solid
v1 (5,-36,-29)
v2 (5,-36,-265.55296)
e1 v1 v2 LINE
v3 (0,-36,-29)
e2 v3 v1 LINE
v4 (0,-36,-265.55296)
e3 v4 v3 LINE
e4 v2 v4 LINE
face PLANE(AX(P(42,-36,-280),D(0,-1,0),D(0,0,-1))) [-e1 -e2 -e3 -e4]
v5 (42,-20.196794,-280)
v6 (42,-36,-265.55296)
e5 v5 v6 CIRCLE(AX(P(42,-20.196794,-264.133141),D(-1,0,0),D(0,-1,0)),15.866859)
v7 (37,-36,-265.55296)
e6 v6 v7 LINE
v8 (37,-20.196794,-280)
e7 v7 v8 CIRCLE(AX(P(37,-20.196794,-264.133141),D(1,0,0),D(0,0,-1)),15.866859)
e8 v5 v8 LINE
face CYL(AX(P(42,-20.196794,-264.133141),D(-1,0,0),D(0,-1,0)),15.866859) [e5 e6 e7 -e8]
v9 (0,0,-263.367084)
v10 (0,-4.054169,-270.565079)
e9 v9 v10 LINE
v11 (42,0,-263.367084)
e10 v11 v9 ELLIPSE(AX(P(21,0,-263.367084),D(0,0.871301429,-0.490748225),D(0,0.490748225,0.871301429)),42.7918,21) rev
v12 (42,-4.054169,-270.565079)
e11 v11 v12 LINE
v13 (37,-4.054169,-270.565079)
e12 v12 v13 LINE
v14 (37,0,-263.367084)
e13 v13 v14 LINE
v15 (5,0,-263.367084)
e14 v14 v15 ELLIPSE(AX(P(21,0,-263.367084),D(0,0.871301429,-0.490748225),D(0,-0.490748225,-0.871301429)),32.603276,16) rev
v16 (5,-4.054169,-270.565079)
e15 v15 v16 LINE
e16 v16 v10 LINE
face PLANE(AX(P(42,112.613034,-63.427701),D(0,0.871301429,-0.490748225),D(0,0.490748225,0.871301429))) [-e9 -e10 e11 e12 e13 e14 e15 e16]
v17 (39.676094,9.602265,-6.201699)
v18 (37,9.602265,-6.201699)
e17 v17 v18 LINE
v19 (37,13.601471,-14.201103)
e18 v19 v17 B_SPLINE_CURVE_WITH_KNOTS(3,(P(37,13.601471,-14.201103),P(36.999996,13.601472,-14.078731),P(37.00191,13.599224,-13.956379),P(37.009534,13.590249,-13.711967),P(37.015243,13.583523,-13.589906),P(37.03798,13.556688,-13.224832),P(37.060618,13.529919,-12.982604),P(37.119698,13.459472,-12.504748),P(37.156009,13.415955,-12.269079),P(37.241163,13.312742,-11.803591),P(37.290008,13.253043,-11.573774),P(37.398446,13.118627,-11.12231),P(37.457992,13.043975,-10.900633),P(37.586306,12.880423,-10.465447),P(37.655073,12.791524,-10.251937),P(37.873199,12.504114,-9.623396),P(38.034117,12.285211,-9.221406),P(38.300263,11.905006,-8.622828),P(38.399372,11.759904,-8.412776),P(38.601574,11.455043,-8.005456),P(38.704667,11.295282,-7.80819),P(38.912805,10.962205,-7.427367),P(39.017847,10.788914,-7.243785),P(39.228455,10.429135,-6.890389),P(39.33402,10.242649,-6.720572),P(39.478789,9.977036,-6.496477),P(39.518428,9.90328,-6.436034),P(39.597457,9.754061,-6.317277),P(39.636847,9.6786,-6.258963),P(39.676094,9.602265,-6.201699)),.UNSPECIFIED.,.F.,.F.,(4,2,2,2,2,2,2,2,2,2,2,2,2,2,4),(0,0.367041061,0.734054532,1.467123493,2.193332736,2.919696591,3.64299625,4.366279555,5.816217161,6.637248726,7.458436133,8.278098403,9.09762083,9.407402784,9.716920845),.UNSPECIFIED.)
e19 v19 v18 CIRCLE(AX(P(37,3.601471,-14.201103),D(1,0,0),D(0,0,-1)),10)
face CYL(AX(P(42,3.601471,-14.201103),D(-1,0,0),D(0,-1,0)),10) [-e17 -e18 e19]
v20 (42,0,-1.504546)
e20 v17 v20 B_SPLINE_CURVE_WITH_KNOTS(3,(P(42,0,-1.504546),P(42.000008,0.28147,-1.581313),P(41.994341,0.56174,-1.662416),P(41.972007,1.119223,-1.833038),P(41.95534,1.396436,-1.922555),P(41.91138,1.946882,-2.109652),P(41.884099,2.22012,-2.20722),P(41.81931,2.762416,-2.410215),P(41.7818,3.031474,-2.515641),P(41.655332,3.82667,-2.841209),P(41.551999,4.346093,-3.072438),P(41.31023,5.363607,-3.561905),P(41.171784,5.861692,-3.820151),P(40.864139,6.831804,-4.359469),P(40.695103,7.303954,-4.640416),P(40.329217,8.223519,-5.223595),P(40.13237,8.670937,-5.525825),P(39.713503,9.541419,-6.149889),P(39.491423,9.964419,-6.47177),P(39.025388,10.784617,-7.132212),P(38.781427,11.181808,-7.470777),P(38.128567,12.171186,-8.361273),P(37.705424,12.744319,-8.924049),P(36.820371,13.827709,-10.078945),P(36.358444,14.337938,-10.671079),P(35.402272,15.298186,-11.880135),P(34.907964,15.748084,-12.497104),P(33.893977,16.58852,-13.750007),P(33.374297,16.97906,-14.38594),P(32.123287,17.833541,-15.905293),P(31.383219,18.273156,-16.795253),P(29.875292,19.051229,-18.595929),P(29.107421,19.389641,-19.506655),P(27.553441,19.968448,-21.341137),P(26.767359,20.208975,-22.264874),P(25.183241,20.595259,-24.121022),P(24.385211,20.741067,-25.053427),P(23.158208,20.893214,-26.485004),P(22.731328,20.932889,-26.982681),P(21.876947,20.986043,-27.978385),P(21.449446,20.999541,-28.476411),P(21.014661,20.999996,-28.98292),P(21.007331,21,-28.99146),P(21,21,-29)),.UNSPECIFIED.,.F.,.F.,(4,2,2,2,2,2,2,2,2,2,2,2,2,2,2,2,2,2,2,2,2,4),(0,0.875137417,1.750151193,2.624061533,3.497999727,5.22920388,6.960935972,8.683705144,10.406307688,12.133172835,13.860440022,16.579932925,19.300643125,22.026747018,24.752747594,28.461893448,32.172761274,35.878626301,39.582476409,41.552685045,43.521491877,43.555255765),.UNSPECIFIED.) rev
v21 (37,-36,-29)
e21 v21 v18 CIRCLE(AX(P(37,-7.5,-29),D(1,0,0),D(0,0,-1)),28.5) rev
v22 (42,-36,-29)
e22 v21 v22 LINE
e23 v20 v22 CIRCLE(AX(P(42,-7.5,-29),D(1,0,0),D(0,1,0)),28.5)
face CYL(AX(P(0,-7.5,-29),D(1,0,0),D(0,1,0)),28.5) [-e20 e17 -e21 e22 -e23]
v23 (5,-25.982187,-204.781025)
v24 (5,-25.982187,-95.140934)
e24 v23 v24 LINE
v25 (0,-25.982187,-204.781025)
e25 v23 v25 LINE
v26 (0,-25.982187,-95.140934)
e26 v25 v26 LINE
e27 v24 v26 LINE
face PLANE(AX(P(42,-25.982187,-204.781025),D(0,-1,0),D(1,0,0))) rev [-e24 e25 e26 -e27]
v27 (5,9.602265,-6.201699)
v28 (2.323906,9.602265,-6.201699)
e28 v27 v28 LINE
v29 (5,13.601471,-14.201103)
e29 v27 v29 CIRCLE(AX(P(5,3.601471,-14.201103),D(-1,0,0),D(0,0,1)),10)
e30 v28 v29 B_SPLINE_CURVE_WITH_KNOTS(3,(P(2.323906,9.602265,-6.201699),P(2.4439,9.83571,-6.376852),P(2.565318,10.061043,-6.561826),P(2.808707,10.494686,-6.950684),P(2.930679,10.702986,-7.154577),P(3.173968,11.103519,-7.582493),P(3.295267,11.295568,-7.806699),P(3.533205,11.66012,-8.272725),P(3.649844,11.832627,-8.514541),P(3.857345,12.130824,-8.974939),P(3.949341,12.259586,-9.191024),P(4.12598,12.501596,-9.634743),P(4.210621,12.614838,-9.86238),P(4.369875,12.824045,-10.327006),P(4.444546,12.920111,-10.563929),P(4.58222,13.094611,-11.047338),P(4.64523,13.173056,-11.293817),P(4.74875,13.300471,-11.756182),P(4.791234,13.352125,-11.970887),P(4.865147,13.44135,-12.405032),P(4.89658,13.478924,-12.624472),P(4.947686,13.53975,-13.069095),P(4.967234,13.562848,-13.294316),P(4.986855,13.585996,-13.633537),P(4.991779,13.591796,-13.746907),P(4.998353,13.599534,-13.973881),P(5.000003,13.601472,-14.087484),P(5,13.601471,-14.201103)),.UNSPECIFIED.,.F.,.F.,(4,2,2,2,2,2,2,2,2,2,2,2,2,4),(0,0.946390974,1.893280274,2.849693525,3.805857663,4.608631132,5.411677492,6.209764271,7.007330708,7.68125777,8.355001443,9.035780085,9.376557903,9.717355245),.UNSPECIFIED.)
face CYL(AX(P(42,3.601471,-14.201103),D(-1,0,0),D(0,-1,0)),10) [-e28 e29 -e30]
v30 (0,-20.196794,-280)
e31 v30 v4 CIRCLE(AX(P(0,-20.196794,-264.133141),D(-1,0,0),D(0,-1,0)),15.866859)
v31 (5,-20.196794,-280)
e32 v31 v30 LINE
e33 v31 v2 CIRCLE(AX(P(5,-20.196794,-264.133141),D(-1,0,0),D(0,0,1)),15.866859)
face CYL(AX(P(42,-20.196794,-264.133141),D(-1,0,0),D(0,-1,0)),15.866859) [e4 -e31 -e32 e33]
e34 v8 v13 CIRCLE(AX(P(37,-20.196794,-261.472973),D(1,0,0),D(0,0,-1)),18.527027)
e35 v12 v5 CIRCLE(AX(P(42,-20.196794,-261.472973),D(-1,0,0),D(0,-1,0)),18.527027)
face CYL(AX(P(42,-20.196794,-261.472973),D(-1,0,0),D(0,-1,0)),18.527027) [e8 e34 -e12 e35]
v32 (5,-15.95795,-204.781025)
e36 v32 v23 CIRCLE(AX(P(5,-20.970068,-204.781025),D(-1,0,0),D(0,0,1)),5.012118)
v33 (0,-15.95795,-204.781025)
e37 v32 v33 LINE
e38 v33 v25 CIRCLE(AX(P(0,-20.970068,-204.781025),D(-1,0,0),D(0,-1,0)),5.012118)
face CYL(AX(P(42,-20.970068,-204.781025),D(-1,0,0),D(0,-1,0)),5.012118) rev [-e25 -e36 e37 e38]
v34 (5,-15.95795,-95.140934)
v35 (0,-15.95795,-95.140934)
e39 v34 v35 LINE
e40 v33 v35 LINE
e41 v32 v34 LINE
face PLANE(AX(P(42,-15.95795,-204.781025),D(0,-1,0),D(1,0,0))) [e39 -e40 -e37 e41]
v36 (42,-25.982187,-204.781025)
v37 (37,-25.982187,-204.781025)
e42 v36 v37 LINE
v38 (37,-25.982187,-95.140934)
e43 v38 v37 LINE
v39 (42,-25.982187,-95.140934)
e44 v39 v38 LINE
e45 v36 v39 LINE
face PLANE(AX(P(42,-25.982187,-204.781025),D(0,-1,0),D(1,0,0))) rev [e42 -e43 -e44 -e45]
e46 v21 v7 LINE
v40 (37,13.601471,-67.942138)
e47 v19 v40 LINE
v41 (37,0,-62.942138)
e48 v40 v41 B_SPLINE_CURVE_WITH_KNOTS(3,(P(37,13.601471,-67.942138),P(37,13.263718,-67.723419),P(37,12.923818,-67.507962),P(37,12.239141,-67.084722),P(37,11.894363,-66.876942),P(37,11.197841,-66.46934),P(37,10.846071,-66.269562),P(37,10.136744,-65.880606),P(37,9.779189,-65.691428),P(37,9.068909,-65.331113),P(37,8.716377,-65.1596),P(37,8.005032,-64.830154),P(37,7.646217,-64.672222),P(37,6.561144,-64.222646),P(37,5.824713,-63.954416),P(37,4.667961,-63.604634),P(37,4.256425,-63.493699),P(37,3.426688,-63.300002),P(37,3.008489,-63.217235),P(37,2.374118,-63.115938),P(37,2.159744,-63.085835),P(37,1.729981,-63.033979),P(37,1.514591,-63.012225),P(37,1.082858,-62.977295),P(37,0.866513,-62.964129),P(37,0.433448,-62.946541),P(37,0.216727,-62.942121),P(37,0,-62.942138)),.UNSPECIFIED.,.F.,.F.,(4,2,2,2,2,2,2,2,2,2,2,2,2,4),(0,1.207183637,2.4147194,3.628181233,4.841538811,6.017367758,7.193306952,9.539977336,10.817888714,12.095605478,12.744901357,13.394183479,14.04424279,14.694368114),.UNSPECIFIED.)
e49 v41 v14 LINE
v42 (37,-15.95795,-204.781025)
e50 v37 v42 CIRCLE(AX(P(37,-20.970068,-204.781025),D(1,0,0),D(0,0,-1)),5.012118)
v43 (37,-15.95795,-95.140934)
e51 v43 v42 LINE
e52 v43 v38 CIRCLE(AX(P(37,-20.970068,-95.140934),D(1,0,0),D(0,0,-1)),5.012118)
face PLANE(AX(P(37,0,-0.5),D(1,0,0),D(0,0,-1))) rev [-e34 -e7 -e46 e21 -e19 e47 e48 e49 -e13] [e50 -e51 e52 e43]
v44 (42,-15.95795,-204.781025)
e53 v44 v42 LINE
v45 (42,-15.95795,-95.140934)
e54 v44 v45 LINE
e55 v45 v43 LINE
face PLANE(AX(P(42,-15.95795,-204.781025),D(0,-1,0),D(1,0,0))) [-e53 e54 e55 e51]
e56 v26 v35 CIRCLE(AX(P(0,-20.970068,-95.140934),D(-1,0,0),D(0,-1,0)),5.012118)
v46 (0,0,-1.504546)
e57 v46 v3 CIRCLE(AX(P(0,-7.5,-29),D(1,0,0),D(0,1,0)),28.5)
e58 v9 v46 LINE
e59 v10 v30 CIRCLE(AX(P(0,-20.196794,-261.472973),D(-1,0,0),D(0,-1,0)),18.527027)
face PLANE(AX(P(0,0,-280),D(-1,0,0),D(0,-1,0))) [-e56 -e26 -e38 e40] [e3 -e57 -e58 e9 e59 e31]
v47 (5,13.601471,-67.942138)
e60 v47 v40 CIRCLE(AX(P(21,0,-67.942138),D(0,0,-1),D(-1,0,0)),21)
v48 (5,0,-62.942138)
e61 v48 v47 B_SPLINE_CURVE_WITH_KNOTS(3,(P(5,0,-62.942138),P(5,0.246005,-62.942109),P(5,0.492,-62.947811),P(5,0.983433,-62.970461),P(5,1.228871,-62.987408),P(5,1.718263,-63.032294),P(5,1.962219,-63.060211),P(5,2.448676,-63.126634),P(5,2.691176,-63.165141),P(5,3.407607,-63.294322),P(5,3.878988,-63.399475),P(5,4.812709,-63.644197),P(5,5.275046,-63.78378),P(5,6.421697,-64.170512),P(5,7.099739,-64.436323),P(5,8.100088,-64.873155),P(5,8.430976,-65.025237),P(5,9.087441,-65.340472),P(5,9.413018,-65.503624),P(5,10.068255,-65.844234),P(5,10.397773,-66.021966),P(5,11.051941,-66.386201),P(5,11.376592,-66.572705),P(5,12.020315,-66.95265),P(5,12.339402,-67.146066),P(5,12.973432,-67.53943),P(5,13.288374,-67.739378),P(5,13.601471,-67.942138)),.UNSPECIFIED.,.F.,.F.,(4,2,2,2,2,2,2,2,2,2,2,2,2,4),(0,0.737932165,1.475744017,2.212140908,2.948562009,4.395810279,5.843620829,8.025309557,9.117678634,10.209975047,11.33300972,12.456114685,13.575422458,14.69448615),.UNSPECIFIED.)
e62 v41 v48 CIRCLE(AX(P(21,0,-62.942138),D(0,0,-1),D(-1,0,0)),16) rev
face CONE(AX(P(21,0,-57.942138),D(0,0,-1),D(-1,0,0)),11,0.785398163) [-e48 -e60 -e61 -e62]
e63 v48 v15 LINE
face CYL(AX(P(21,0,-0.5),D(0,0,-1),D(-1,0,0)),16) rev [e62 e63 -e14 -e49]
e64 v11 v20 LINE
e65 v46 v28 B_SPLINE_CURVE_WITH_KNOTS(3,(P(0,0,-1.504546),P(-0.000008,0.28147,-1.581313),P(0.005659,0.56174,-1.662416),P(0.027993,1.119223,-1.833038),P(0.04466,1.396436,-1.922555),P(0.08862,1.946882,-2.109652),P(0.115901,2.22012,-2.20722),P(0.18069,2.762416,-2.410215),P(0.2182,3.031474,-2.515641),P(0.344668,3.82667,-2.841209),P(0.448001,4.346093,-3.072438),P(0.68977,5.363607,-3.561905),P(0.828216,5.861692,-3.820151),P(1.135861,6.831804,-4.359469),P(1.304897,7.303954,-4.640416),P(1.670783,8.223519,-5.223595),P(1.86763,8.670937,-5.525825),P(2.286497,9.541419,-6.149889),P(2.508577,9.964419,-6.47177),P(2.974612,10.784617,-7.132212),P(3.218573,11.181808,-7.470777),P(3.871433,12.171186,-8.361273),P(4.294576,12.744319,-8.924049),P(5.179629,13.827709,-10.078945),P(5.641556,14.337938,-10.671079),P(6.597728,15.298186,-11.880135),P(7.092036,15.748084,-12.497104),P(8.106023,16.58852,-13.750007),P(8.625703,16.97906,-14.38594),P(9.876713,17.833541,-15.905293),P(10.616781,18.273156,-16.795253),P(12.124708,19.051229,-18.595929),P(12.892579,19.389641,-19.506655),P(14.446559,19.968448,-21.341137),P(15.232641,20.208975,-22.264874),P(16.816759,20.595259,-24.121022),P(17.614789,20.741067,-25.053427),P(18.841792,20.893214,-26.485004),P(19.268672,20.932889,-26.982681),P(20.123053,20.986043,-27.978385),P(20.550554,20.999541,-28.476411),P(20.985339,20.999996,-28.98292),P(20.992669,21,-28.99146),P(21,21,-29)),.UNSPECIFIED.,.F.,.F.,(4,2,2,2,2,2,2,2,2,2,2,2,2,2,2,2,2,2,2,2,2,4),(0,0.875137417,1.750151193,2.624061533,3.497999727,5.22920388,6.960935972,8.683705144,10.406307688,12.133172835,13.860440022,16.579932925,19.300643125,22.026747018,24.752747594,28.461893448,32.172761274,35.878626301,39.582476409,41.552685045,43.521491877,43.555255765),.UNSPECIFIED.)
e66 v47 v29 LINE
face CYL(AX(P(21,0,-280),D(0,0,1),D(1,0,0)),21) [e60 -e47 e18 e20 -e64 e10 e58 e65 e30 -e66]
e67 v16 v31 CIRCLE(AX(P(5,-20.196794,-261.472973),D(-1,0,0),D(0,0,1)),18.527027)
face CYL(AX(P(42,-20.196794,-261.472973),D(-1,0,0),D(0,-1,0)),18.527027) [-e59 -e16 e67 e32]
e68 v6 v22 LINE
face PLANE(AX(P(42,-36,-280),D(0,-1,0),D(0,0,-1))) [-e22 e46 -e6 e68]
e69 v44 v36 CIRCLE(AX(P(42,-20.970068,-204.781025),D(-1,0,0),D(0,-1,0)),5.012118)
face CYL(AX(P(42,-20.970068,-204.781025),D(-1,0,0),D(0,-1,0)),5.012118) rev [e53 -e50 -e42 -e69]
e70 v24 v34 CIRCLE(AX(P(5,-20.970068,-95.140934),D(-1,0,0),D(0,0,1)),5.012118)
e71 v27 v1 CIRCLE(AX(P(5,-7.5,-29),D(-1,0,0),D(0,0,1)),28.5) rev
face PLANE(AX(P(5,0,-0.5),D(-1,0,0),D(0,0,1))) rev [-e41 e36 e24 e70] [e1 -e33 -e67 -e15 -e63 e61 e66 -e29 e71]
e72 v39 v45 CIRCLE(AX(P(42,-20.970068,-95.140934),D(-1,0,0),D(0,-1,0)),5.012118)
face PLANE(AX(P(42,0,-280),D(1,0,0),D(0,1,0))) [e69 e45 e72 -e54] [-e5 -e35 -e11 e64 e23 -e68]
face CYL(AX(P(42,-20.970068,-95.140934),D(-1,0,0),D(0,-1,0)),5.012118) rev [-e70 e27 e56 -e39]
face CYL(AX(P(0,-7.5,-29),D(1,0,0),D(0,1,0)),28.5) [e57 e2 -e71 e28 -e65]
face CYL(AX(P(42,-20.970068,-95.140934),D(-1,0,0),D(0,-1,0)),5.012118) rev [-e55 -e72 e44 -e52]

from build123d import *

# Parameters (mm, degrees)
WHOLEBODY_DEPTH    = 280
UPPERCURVE_DEPTH   = 286.41198293
SKETCH6_W          = 32
SKETCH6_H          = 5
CUT_EXTRUDE5_DEPTH = 285.921480537
CUT_EXTRUDE6_DEPTH = 286.411983055
UPPERHOLE_DEPTH    = 289.81308838
CHAMFER1_SIZE      = 10
CUT_EXTRUDE8_DEPTH = 286.411982957
CUT_EXTRUDE9_DEPTH = 286.411982957


with BuildPart() as part:
    # Sketch1 → WholeBody (new body)
    with BuildSketch(Plane.XY):
        with BuildLine():
            Line((0, 0), (0, -36))
            Line((0, -36), (42, -36))
            Line((42, -36), (42, 0))
            ThreePointArc((42, 0), (21, 21), (0, 0))
        make_face()
    extrude(amount=-WHOLEBODY_DEPTH)

    # Sketch2 → UpperCurve (cut, through all)
    with BuildSketch(Plane(origin=(42, 0, 0), x_dir=(0, 0, -1), z_dir=(1, 0, 0))):
        with BuildLine():
            ThreePointArc((29, -36), (0.5, -7.5), (29, 21))
            Line((29, 21), (0, 21))
            Line((0, 21), (0, 0))
            Line((0, 0), (0, -36))
            Line((0, -36), (29, -36))
        make_face()
    extrude(amount=-UPPERCURVE_DEPTH, mode=Mode.SUBTRACT)

    # Sketch6 → Cut-Extrude5 (cut, through all)
    with BuildSketch(Plane(origin=(0, 0, -280), x_dir=(-1, 0, 0), z_dir=(0, 0, -1))):
        with BuildLine():
            Line((-37, 0), (-37, -31))
            Line((-37, -31), (-5, -31))
            Line((-5, -31), (-5, 0))
            ThreePointArc((-5, 0), (-21, 16), (-37, 0))
        make_face()
        with Locations((-21, -33.5)):
            Rectangle(SKETCH6_W, SKETCH6_H)
    extrude(amount=-CUT_EXTRUDE5_DEPTH, mode=Mode.SUBTRACT)

    # Sketch8 → Cut-Extrude6 (cut, through all)
    with BuildSketch(Plane.ZY):
        Polygon((-263.367084443, 0), (-226.082527774, 21), (-280, 21), (-280, 0), align=None)
        with BuildLine():
            Line((-270.565078665, -4.054168593), (-263.367084443, 0))
            Line((-263.367084443, 0), (-280, 0))
            Line((-280, 0), (-280, -20.196793601))
            ThreePointArc((-280, -20.196793601), (-277.468291323, -10.847969039), (-270.565078665, -4.054168593))
        make_face()
        with BuildLine():
            ThreePointArc((-265.552960254, -36), (-275.843932749, -30.902613162), (-280, -20.196793601))
            Line((-280, -20.196793601), (-280, -36))
            Line((-280, -36), (-265.552960254, -36))
        make_face()
    extrude(amount=-CUT_EXTRUDE6_DEPTH, mode=Mode.SUBTRACT)

    # Sketch9 → UpperHole (cut, through all)
    with BuildSketch(Plane.XZ.offset(36)):
        Polygon((5, -0.5), (5, -57.942137899), (37, -57.942137899), (37, -29), (37, 4.098042087), (5, 4.098042087), align=None)
    extrude(amount=-UPPERHOLE_DEPTH, mode=Mode.SUBTRACT)

    # Chamfer1
    # the kernel refuses this chamfer: 10 mm, written as the material it takes off along each edge
    with BuildSketch(Plane(origin=(21, 0, -57.942137899), x_dir=(0.86749005683434, -0.49745452183446237, 0), z_dir=(-0.49745452183446237, -0.86749005683434, 0))) as chamfer1_piece_1_section:
        Polygon((21, -CHAMFER1_SIZE), (21 - CHAMFER1_SIZE, 0), (21, 0), align=None)
    chamfer1_piece_1 = revolve(axis=Axis((21, 0, -57.942137899), (0, 0, 1)), revolution_arc=239.663469858, mode=Mode.PRIVATE)
    chamfer1_piece_1 = split(chamfer1_piece_1, bisect_by=Plane(origin=(5, 16.096053983, -62.846083916), z_dir=(1, 0, 0)), keep=Keep.TOP, mode=Mode.PRIVATE)
    chamfer1_piece_1 = split(chamfer1_piece_1, bisect_by=Plane(origin=(37, 16.096053983, -62.846083916), z_dir=(-1, 0, 0)), keep=Keep.TOP, mode=Mode.PRIVATE)
    add(chamfer1_piece_1, mode=Mode.SUBTRACT)

    # Sketch11 → Cut-Extrude8 (cut, through all)
    with BuildSketch(Plane.ZY):
        with BuildLine():
            Line((-9.843331647, 13.601470509), (-14.201102996, 13.601470509))
            ThreePointArc((-14.201102996, 13.601470509), (-9.729411408, 12.545964589), (-6.20169921, 9.602265378))
            ThreePointArc((-6.20169921, 9.602265378), (-7.927428506, 11.688453055), (-9.843331647, 13.601470509))
        make_face()
    extrude(amount=-CUT_EXTRUDE8_DEPTH, mode=Mode.SUBTRACT)

    # Sketch12 → Cut-Extrude9 (cut, through all)
    with BuildSketch(Plane.ZY):
        with BuildLine():
            Line((-204.781024531, -15.957949817), (-95.140934308, -15.957949817))
            ThreePointArc((-95.140934308, -15.957949817), (-90.128815898, -20.970068227), (-95.140934308, -25.982186638))
            Line((-95.140934308, -25.982186638), (-204.781024531, -25.982186638))
            ThreePointArc((-204.781024531, -25.982186638), (-209.793142941, -20.970068227), (-204.781024531, -15.957949817))
        make_face()
    extrude(amount=-CUT_EXTRUDE9_DEPTH, mode=Mode.SUBTRACT)


solid = part.part
